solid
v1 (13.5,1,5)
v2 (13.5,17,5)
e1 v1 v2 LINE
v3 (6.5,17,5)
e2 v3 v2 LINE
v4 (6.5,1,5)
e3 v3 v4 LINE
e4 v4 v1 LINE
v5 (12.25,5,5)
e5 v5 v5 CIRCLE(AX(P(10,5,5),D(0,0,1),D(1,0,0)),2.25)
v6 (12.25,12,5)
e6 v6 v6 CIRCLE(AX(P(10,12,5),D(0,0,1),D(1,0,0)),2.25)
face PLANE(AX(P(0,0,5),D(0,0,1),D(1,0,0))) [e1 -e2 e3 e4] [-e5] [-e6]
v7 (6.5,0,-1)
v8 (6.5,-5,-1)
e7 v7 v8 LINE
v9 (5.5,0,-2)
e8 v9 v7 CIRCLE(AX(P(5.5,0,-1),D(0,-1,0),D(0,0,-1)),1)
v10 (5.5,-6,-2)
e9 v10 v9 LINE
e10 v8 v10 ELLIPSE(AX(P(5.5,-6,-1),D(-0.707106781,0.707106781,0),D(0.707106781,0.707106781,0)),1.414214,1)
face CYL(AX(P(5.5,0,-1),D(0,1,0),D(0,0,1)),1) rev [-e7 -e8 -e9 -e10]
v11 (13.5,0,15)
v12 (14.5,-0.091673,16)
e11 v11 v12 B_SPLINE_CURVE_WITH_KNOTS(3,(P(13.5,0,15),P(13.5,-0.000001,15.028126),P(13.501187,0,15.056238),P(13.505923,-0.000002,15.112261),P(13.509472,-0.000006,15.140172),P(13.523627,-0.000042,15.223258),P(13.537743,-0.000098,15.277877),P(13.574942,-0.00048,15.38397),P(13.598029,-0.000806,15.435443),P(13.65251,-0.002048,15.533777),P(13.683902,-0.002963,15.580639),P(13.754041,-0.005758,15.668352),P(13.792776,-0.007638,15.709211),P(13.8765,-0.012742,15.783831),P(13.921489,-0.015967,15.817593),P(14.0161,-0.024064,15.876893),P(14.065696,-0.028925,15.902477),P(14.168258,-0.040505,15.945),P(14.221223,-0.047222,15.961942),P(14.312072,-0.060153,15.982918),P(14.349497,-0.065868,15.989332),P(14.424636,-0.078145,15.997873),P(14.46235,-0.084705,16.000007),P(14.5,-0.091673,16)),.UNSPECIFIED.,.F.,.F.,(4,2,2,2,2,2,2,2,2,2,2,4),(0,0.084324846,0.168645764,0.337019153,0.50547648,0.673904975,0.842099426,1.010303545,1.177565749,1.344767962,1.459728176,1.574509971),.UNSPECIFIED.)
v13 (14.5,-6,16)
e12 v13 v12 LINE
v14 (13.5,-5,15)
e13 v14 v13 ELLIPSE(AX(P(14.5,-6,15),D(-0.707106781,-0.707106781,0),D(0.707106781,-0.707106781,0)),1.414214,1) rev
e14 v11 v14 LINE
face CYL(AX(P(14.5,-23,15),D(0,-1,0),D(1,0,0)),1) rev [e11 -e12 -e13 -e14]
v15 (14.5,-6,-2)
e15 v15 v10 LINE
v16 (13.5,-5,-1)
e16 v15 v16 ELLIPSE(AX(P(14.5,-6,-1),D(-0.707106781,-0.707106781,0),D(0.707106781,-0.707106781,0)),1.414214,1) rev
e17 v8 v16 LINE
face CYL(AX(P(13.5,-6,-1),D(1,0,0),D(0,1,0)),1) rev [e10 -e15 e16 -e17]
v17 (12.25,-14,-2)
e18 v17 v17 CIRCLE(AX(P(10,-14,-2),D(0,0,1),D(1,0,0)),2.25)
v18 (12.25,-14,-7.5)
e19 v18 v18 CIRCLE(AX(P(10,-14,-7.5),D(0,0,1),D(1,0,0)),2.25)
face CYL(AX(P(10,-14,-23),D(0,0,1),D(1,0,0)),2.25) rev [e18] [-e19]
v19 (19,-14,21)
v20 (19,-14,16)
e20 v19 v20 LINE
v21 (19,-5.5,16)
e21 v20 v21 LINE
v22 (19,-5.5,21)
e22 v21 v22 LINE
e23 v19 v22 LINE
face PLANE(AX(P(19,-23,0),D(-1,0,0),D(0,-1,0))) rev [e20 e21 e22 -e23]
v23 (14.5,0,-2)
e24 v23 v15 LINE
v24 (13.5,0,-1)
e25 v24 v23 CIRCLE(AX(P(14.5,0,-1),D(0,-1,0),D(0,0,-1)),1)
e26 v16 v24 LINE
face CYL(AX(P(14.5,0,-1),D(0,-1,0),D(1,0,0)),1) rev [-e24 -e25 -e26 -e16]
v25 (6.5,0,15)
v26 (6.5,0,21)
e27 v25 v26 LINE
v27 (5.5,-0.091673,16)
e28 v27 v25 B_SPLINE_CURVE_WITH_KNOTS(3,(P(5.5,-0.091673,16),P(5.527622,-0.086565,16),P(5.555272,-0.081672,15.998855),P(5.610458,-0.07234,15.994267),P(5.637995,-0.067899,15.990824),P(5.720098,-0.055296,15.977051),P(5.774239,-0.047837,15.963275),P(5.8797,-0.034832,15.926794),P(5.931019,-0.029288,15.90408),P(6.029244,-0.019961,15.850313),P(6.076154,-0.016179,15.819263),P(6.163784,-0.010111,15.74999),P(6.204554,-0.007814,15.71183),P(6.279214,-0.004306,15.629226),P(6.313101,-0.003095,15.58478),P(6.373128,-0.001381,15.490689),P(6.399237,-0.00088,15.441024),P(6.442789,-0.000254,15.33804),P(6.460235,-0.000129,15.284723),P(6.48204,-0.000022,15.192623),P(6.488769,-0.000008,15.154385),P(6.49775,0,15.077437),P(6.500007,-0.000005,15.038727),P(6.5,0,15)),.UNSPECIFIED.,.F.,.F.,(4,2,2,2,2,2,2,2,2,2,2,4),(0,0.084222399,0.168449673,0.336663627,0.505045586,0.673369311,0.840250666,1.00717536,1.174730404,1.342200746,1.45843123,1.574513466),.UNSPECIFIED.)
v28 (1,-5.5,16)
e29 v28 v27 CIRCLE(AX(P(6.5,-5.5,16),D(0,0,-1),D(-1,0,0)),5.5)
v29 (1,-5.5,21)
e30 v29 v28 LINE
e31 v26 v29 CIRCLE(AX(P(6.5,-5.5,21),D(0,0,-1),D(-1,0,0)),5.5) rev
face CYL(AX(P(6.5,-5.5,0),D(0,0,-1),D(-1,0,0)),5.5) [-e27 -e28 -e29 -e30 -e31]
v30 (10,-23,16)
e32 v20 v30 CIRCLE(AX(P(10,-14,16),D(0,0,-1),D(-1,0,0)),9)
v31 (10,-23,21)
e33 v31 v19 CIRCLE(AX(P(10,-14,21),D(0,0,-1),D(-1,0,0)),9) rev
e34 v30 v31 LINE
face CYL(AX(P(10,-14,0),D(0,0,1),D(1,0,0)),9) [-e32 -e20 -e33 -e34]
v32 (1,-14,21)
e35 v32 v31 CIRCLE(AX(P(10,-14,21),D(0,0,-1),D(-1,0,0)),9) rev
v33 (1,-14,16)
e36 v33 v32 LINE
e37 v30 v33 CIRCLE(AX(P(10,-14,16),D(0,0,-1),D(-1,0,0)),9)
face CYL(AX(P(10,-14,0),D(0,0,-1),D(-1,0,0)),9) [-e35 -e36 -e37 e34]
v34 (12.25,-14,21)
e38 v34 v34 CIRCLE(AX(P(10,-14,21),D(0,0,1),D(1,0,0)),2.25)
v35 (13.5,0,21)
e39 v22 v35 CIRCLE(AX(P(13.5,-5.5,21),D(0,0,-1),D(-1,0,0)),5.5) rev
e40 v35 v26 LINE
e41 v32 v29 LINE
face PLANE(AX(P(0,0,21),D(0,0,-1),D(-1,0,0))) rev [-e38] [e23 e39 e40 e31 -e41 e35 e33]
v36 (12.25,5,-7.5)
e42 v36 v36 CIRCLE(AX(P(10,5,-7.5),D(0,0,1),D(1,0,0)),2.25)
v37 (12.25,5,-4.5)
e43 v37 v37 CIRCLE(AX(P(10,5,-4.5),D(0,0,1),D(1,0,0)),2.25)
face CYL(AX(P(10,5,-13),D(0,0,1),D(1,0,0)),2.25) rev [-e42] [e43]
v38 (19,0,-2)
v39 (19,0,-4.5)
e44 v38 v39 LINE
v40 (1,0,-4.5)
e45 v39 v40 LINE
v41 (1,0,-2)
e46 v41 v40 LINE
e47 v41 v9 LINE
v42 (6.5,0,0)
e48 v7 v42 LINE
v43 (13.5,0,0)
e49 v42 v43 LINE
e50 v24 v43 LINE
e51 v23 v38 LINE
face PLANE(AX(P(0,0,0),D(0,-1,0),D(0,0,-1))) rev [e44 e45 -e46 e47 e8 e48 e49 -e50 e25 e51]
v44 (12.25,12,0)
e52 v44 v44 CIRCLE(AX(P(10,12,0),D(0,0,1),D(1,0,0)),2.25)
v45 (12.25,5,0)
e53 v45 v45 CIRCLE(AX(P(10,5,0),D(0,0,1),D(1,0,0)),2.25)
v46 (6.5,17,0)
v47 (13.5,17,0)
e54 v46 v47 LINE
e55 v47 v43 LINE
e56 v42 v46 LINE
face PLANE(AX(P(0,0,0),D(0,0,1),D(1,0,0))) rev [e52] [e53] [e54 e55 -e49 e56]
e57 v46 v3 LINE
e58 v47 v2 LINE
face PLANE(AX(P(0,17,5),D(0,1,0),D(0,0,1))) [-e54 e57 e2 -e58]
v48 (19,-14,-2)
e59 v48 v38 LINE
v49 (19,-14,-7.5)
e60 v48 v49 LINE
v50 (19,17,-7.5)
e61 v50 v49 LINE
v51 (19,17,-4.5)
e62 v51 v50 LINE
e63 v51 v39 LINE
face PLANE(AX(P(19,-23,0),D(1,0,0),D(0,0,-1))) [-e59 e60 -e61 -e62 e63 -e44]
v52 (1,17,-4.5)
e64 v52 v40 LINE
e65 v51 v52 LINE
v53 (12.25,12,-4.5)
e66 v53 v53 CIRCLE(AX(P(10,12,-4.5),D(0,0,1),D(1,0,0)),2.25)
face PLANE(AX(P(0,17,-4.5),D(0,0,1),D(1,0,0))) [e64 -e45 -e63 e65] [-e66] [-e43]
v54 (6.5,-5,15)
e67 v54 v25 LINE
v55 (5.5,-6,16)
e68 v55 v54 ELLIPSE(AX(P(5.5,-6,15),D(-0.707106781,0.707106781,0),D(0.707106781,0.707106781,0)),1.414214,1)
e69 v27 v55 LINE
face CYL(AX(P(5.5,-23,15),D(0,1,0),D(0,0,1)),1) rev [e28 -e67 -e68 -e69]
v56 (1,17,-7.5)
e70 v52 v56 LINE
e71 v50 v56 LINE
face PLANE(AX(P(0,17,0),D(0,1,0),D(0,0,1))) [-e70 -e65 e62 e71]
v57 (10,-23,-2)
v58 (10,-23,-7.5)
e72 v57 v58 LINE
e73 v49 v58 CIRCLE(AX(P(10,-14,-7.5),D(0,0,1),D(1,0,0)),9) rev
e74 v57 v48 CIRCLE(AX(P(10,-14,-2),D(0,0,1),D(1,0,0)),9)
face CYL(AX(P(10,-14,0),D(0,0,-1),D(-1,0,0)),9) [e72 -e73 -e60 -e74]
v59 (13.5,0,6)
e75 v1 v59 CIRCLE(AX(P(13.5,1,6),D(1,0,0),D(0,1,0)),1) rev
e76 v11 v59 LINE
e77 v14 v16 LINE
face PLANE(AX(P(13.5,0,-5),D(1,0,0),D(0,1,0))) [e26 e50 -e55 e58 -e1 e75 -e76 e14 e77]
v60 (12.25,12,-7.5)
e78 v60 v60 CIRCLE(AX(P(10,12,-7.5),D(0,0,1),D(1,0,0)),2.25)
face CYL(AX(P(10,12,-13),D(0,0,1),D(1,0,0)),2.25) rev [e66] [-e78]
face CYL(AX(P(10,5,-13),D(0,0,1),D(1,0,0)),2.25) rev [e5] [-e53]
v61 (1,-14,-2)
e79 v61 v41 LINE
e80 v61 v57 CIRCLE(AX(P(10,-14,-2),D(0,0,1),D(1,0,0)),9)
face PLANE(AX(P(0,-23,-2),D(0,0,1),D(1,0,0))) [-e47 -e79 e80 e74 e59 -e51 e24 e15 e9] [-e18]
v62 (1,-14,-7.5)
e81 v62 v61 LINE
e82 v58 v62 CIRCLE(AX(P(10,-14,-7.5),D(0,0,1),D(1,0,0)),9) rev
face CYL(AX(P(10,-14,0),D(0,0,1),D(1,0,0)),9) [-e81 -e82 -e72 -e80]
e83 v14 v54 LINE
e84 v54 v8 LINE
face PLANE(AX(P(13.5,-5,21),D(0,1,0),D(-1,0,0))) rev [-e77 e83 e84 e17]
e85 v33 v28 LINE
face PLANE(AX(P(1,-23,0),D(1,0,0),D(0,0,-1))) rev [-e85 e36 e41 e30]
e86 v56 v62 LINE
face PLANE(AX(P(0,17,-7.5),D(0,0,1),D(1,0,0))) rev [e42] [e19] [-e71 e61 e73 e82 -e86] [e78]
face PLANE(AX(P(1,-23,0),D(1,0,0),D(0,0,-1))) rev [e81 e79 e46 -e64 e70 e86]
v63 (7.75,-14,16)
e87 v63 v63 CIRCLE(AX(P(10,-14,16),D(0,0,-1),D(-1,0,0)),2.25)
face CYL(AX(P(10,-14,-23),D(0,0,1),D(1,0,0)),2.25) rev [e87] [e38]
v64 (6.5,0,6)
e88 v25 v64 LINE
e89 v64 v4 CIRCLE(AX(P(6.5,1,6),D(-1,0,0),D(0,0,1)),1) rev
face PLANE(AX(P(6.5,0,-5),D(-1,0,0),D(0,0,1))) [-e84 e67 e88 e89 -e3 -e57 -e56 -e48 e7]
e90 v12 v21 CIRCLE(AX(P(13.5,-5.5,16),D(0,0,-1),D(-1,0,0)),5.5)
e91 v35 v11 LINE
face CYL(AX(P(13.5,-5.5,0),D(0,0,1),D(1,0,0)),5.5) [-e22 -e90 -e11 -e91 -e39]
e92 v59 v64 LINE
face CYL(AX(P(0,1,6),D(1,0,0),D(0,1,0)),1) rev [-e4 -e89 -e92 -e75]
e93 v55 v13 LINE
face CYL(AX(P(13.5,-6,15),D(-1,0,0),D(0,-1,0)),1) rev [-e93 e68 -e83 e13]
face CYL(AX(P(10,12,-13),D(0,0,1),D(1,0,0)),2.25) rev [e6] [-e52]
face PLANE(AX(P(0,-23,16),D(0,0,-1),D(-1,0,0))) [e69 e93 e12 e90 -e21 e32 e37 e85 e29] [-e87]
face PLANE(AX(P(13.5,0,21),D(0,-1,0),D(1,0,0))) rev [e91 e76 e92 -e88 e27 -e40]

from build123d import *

# Parameters (mm, degrees)
ESQUISSE1_W             = 20
ESQUISSE1_H             = 17
ESQUISSE1_R             = 2.1
BOSS_EXTRU_1_DEPTH      = 5
ESQUISSE2_W             = 18
ESQUISSE2_H             = 3
BOSS_EXTRU_3_DEPTH      = 23
ESQUISSE5_W             = 6.5
ESQUISSE5_H             = 17
ENL_V_MAT_EXTRU_3_DEPTH = 18
ESQUISSE10_W            = 7
ESQUISSE10_H            = 3
BOSS_EXTRU_6_DEPTH      = 10
ESQUISSE11_W            = 5.5
ESQUISSE11_H            = 2.5
ESQUISSE11_W_2          = 7
ESQUISSE11_H_2          = 0.5
BOSS_EXTRU_7_DEPTH      = 17
ESQUISSE12_W            = 18
ESQUISSE12_H            = 2.5
BOSS_EXTRU_8_DEPTH      = 23
CONG_3_R                = 9
ESQUISSE20_R            = 2.25
ENL_V_MAT_EXTRU_7_DEPTH = 18
ESQUISSE22_W            = 7
ESQUISSE22_H            = 5
BOSS_EXTRU_9_DEPTH      = 23
ESQUISSE27_W            = 5.5
ESQUISSE27_H            = 5
ESQUISSE27_W_2          = 7
BOSS_EXTRU_10_DEPTH     = 23
CONG_4_R                = 9
ESQUISSE28_R            = 2.25
ENL_V_MAT_EXTRU_8_DEPTH = 44
CONG_5_R                = 1
CONG_6_R                = 5.5


with BuildPart() as part:
    # Esquisse1 → Boss.-Extru.1 (new body)
    with BuildSketch(Plane.XY):
        with Locations((10, 8.5)):
            Rectangle(ESQUISSE1_W, ESQUISSE1_H)
        with Locations((10, 5)):
            Circle(ESQUISSE1_R, mode=Mode.SUBTRACT)
        with Locations((10, 12)):
            Circle(ESQUISSE1_R, mode=Mode.SUBTRACT)
    extrude(amount=BOSS_EXTRU_1_DEPTH)

    # Esquisse5 → Enlèv. mat.-Extru.3 (cut)
    with BuildSketch(Plane.XY.offset(5)):
        with Locations((16.75, 8.5)):
            Rectangle(ESQUISSE5_W, ESQUISSE5_H)
        with Locations((3.25, 8.5)):
            Rectangle(ESQUISSE5_W, ESQUISSE5_H)
    extrude(amount=-ENL_V_MAT_EXTRU_3_DEPTH, mode=Mode.SUBTRACT)



with BuildPart() as body_2:
    # Esquisse2 → Boss.-Extru.3 (new body)
    with BuildSketch(Plane.XZ):
        with Locations((10, -3.5)):
            Rectangle(ESQUISSE2_W, ESQUISSE2_H)
    extrude(amount=BOSS_EXTRU_3_DEPTH)


with BuildPart() as part_1:
    add(part.part)

    add(body_2.part)  # Boss.-Extru.6 merges body 2
    # Esquisse10 → Boss.-Extru.6 (add)
    with BuildSketch(Plane.XY.offset(5)):
        with Locations((10, -1.5)):
            Rectangle(ESQUISSE10_W, ESQUISSE10_H)
    extrude(amount=-BOSS_EXTRU_6_DEPTH)

    # Esquisse11 → Boss.-Extru.7 (add)
    with BuildSketch(Plane(origin=(0, 0, 0), x_dir=(1, 0, 0), z_dir=(0, 1, 0))):
        with Locations((3.75, 6.25)):
            Rectangle(ESQUISSE11_W, ESQUISSE11_H)
        with Locations((10, 6.25)):
            Rectangle(ESQUISSE11_W_2, ESQUISSE11_H)
        with Locations((16.25, 6.25)):
            Rectangle(ESQUISSE11_W, ESQUISSE11_H)
        with Locations((3.75, 4.75)):
            Rectangle(ESQUISSE11_W, ESQUISSE11_H_2)
        with Locations((10, 4.75)):
            Rectangle(ESQUISSE11_W_2, ESQUISSE11_H_2)
        with Locations((16.25, 4.75)):
            Rectangle(ESQUISSE11_W, ESQUISSE11_H_2)
    extrude(amount=BOSS_EXTRU_7_DEPTH)

    # Esquisse12 → Boss.-Extru.8 (add)
    with BuildSketch(Plane.XZ):
        with Locations((10, -6.25)):
            Rectangle(ESQUISSE12_W, ESQUISSE12_H)
    extrude(amount=BOSS_EXTRU_8_DEPTH)

    # Congé3
    cong_3_edges = [part_1.edges().sort_by_distance(p)[0] for p in [
        (19, -23, -4.75),
        (1, -23, -4.75),
    ]]
    fillet(cong_3_edges, radius=CONG_3_R - 0.0001)  # a hair under: the kernel refuses the full size

    # Esquisse20 → Enlèv. mat.-Extru.7 (cut)
    with BuildSketch(Plane.XY.offset(5)):
        with Locations((10, 5)):
            Circle(ESQUISSE20_R)
        with Locations((10, 12)):
            Circle(ESQUISSE20_R)
    extrude(amount=-ENL_V_MAT_EXTRU_7_DEPTH, mode=Mode.SUBTRACT)

    # Esquisse22 → Boss.-Extru.9 (add)
    with BuildSketch(Plane.XY.offset(-2)):
        with Locations((10, -2.5)):
            Rectangle(ESQUISSE22_W, ESQUISSE22_H)
    extrude(amount=BOSS_EXTRU_9_DEPTH)

    # Esquisse27 → Boss.-Extru.10 (add)
    with BuildSketch(Plane(origin=(0, 0, 0), x_dir=(1, 0, 0), z_dir=(0, 1, 0))):
        with Locations((3.75, -18.5)):
            Rectangle(ESQUISSE27_W, ESQUISSE27_H)
        with Locations((16.25, -18.5)):
            Rectangle(ESQUISSE27_W, ESQUISSE27_H)
        with Locations((10, -18.5)):
            Rectangle(ESQUISSE27_W_2, ESQUISSE27_H)
    extrude(amount=-BOSS_EXTRU_10_DEPTH)

    # Congé4
    cong_4_edges = [part_1.edges().sort_by_distance(p)[0] for p in [
        (1, -23, 18.5),
        (19, -23, 18.5),
    ]]
    fillet(cong_4_edges, radius=CONG_4_R - 0.0001)  # a hair under: the kernel refuses the full size

    # Esquisse28 → Enlèv. mat.-Extru.8 (cut)
    with BuildSketch(Plane.XY.offset(21)):
        with Locations((10, -14)):
            Circle(ESQUISSE28_R)
    extrude(amount=-ENL_V_MAT_EXTRU_8_DEPTH, mode=Mode.SUBTRACT)

    # Congé5
    cong_5_edges = [part_1.edges().sort_by_distance(p)[0] for p in [
        (10, 0, 5),
        (10, -5, -2),
        (10, -5, 16),
        (6.5, -2.5, 16),
        (13.5, -2.5, 16),
        (6.5, -2.5, -2),
        (13.5, -2.5, -2),
    ]]
    fillet(cong_5_edges, radius=CONG_5_R)

    # Congé6
    cong_6_edges = [part_1.edges().sort_by_distance(p)[0] for p in [
        (1, 0, 18.5),
        (19, 0, 18.5),
    ]]
    fillet(cong_6_edges, radius=CONG_6_R - 0.0001)  # a hair under: the kernel refuses the full size


solid = part_1.part
